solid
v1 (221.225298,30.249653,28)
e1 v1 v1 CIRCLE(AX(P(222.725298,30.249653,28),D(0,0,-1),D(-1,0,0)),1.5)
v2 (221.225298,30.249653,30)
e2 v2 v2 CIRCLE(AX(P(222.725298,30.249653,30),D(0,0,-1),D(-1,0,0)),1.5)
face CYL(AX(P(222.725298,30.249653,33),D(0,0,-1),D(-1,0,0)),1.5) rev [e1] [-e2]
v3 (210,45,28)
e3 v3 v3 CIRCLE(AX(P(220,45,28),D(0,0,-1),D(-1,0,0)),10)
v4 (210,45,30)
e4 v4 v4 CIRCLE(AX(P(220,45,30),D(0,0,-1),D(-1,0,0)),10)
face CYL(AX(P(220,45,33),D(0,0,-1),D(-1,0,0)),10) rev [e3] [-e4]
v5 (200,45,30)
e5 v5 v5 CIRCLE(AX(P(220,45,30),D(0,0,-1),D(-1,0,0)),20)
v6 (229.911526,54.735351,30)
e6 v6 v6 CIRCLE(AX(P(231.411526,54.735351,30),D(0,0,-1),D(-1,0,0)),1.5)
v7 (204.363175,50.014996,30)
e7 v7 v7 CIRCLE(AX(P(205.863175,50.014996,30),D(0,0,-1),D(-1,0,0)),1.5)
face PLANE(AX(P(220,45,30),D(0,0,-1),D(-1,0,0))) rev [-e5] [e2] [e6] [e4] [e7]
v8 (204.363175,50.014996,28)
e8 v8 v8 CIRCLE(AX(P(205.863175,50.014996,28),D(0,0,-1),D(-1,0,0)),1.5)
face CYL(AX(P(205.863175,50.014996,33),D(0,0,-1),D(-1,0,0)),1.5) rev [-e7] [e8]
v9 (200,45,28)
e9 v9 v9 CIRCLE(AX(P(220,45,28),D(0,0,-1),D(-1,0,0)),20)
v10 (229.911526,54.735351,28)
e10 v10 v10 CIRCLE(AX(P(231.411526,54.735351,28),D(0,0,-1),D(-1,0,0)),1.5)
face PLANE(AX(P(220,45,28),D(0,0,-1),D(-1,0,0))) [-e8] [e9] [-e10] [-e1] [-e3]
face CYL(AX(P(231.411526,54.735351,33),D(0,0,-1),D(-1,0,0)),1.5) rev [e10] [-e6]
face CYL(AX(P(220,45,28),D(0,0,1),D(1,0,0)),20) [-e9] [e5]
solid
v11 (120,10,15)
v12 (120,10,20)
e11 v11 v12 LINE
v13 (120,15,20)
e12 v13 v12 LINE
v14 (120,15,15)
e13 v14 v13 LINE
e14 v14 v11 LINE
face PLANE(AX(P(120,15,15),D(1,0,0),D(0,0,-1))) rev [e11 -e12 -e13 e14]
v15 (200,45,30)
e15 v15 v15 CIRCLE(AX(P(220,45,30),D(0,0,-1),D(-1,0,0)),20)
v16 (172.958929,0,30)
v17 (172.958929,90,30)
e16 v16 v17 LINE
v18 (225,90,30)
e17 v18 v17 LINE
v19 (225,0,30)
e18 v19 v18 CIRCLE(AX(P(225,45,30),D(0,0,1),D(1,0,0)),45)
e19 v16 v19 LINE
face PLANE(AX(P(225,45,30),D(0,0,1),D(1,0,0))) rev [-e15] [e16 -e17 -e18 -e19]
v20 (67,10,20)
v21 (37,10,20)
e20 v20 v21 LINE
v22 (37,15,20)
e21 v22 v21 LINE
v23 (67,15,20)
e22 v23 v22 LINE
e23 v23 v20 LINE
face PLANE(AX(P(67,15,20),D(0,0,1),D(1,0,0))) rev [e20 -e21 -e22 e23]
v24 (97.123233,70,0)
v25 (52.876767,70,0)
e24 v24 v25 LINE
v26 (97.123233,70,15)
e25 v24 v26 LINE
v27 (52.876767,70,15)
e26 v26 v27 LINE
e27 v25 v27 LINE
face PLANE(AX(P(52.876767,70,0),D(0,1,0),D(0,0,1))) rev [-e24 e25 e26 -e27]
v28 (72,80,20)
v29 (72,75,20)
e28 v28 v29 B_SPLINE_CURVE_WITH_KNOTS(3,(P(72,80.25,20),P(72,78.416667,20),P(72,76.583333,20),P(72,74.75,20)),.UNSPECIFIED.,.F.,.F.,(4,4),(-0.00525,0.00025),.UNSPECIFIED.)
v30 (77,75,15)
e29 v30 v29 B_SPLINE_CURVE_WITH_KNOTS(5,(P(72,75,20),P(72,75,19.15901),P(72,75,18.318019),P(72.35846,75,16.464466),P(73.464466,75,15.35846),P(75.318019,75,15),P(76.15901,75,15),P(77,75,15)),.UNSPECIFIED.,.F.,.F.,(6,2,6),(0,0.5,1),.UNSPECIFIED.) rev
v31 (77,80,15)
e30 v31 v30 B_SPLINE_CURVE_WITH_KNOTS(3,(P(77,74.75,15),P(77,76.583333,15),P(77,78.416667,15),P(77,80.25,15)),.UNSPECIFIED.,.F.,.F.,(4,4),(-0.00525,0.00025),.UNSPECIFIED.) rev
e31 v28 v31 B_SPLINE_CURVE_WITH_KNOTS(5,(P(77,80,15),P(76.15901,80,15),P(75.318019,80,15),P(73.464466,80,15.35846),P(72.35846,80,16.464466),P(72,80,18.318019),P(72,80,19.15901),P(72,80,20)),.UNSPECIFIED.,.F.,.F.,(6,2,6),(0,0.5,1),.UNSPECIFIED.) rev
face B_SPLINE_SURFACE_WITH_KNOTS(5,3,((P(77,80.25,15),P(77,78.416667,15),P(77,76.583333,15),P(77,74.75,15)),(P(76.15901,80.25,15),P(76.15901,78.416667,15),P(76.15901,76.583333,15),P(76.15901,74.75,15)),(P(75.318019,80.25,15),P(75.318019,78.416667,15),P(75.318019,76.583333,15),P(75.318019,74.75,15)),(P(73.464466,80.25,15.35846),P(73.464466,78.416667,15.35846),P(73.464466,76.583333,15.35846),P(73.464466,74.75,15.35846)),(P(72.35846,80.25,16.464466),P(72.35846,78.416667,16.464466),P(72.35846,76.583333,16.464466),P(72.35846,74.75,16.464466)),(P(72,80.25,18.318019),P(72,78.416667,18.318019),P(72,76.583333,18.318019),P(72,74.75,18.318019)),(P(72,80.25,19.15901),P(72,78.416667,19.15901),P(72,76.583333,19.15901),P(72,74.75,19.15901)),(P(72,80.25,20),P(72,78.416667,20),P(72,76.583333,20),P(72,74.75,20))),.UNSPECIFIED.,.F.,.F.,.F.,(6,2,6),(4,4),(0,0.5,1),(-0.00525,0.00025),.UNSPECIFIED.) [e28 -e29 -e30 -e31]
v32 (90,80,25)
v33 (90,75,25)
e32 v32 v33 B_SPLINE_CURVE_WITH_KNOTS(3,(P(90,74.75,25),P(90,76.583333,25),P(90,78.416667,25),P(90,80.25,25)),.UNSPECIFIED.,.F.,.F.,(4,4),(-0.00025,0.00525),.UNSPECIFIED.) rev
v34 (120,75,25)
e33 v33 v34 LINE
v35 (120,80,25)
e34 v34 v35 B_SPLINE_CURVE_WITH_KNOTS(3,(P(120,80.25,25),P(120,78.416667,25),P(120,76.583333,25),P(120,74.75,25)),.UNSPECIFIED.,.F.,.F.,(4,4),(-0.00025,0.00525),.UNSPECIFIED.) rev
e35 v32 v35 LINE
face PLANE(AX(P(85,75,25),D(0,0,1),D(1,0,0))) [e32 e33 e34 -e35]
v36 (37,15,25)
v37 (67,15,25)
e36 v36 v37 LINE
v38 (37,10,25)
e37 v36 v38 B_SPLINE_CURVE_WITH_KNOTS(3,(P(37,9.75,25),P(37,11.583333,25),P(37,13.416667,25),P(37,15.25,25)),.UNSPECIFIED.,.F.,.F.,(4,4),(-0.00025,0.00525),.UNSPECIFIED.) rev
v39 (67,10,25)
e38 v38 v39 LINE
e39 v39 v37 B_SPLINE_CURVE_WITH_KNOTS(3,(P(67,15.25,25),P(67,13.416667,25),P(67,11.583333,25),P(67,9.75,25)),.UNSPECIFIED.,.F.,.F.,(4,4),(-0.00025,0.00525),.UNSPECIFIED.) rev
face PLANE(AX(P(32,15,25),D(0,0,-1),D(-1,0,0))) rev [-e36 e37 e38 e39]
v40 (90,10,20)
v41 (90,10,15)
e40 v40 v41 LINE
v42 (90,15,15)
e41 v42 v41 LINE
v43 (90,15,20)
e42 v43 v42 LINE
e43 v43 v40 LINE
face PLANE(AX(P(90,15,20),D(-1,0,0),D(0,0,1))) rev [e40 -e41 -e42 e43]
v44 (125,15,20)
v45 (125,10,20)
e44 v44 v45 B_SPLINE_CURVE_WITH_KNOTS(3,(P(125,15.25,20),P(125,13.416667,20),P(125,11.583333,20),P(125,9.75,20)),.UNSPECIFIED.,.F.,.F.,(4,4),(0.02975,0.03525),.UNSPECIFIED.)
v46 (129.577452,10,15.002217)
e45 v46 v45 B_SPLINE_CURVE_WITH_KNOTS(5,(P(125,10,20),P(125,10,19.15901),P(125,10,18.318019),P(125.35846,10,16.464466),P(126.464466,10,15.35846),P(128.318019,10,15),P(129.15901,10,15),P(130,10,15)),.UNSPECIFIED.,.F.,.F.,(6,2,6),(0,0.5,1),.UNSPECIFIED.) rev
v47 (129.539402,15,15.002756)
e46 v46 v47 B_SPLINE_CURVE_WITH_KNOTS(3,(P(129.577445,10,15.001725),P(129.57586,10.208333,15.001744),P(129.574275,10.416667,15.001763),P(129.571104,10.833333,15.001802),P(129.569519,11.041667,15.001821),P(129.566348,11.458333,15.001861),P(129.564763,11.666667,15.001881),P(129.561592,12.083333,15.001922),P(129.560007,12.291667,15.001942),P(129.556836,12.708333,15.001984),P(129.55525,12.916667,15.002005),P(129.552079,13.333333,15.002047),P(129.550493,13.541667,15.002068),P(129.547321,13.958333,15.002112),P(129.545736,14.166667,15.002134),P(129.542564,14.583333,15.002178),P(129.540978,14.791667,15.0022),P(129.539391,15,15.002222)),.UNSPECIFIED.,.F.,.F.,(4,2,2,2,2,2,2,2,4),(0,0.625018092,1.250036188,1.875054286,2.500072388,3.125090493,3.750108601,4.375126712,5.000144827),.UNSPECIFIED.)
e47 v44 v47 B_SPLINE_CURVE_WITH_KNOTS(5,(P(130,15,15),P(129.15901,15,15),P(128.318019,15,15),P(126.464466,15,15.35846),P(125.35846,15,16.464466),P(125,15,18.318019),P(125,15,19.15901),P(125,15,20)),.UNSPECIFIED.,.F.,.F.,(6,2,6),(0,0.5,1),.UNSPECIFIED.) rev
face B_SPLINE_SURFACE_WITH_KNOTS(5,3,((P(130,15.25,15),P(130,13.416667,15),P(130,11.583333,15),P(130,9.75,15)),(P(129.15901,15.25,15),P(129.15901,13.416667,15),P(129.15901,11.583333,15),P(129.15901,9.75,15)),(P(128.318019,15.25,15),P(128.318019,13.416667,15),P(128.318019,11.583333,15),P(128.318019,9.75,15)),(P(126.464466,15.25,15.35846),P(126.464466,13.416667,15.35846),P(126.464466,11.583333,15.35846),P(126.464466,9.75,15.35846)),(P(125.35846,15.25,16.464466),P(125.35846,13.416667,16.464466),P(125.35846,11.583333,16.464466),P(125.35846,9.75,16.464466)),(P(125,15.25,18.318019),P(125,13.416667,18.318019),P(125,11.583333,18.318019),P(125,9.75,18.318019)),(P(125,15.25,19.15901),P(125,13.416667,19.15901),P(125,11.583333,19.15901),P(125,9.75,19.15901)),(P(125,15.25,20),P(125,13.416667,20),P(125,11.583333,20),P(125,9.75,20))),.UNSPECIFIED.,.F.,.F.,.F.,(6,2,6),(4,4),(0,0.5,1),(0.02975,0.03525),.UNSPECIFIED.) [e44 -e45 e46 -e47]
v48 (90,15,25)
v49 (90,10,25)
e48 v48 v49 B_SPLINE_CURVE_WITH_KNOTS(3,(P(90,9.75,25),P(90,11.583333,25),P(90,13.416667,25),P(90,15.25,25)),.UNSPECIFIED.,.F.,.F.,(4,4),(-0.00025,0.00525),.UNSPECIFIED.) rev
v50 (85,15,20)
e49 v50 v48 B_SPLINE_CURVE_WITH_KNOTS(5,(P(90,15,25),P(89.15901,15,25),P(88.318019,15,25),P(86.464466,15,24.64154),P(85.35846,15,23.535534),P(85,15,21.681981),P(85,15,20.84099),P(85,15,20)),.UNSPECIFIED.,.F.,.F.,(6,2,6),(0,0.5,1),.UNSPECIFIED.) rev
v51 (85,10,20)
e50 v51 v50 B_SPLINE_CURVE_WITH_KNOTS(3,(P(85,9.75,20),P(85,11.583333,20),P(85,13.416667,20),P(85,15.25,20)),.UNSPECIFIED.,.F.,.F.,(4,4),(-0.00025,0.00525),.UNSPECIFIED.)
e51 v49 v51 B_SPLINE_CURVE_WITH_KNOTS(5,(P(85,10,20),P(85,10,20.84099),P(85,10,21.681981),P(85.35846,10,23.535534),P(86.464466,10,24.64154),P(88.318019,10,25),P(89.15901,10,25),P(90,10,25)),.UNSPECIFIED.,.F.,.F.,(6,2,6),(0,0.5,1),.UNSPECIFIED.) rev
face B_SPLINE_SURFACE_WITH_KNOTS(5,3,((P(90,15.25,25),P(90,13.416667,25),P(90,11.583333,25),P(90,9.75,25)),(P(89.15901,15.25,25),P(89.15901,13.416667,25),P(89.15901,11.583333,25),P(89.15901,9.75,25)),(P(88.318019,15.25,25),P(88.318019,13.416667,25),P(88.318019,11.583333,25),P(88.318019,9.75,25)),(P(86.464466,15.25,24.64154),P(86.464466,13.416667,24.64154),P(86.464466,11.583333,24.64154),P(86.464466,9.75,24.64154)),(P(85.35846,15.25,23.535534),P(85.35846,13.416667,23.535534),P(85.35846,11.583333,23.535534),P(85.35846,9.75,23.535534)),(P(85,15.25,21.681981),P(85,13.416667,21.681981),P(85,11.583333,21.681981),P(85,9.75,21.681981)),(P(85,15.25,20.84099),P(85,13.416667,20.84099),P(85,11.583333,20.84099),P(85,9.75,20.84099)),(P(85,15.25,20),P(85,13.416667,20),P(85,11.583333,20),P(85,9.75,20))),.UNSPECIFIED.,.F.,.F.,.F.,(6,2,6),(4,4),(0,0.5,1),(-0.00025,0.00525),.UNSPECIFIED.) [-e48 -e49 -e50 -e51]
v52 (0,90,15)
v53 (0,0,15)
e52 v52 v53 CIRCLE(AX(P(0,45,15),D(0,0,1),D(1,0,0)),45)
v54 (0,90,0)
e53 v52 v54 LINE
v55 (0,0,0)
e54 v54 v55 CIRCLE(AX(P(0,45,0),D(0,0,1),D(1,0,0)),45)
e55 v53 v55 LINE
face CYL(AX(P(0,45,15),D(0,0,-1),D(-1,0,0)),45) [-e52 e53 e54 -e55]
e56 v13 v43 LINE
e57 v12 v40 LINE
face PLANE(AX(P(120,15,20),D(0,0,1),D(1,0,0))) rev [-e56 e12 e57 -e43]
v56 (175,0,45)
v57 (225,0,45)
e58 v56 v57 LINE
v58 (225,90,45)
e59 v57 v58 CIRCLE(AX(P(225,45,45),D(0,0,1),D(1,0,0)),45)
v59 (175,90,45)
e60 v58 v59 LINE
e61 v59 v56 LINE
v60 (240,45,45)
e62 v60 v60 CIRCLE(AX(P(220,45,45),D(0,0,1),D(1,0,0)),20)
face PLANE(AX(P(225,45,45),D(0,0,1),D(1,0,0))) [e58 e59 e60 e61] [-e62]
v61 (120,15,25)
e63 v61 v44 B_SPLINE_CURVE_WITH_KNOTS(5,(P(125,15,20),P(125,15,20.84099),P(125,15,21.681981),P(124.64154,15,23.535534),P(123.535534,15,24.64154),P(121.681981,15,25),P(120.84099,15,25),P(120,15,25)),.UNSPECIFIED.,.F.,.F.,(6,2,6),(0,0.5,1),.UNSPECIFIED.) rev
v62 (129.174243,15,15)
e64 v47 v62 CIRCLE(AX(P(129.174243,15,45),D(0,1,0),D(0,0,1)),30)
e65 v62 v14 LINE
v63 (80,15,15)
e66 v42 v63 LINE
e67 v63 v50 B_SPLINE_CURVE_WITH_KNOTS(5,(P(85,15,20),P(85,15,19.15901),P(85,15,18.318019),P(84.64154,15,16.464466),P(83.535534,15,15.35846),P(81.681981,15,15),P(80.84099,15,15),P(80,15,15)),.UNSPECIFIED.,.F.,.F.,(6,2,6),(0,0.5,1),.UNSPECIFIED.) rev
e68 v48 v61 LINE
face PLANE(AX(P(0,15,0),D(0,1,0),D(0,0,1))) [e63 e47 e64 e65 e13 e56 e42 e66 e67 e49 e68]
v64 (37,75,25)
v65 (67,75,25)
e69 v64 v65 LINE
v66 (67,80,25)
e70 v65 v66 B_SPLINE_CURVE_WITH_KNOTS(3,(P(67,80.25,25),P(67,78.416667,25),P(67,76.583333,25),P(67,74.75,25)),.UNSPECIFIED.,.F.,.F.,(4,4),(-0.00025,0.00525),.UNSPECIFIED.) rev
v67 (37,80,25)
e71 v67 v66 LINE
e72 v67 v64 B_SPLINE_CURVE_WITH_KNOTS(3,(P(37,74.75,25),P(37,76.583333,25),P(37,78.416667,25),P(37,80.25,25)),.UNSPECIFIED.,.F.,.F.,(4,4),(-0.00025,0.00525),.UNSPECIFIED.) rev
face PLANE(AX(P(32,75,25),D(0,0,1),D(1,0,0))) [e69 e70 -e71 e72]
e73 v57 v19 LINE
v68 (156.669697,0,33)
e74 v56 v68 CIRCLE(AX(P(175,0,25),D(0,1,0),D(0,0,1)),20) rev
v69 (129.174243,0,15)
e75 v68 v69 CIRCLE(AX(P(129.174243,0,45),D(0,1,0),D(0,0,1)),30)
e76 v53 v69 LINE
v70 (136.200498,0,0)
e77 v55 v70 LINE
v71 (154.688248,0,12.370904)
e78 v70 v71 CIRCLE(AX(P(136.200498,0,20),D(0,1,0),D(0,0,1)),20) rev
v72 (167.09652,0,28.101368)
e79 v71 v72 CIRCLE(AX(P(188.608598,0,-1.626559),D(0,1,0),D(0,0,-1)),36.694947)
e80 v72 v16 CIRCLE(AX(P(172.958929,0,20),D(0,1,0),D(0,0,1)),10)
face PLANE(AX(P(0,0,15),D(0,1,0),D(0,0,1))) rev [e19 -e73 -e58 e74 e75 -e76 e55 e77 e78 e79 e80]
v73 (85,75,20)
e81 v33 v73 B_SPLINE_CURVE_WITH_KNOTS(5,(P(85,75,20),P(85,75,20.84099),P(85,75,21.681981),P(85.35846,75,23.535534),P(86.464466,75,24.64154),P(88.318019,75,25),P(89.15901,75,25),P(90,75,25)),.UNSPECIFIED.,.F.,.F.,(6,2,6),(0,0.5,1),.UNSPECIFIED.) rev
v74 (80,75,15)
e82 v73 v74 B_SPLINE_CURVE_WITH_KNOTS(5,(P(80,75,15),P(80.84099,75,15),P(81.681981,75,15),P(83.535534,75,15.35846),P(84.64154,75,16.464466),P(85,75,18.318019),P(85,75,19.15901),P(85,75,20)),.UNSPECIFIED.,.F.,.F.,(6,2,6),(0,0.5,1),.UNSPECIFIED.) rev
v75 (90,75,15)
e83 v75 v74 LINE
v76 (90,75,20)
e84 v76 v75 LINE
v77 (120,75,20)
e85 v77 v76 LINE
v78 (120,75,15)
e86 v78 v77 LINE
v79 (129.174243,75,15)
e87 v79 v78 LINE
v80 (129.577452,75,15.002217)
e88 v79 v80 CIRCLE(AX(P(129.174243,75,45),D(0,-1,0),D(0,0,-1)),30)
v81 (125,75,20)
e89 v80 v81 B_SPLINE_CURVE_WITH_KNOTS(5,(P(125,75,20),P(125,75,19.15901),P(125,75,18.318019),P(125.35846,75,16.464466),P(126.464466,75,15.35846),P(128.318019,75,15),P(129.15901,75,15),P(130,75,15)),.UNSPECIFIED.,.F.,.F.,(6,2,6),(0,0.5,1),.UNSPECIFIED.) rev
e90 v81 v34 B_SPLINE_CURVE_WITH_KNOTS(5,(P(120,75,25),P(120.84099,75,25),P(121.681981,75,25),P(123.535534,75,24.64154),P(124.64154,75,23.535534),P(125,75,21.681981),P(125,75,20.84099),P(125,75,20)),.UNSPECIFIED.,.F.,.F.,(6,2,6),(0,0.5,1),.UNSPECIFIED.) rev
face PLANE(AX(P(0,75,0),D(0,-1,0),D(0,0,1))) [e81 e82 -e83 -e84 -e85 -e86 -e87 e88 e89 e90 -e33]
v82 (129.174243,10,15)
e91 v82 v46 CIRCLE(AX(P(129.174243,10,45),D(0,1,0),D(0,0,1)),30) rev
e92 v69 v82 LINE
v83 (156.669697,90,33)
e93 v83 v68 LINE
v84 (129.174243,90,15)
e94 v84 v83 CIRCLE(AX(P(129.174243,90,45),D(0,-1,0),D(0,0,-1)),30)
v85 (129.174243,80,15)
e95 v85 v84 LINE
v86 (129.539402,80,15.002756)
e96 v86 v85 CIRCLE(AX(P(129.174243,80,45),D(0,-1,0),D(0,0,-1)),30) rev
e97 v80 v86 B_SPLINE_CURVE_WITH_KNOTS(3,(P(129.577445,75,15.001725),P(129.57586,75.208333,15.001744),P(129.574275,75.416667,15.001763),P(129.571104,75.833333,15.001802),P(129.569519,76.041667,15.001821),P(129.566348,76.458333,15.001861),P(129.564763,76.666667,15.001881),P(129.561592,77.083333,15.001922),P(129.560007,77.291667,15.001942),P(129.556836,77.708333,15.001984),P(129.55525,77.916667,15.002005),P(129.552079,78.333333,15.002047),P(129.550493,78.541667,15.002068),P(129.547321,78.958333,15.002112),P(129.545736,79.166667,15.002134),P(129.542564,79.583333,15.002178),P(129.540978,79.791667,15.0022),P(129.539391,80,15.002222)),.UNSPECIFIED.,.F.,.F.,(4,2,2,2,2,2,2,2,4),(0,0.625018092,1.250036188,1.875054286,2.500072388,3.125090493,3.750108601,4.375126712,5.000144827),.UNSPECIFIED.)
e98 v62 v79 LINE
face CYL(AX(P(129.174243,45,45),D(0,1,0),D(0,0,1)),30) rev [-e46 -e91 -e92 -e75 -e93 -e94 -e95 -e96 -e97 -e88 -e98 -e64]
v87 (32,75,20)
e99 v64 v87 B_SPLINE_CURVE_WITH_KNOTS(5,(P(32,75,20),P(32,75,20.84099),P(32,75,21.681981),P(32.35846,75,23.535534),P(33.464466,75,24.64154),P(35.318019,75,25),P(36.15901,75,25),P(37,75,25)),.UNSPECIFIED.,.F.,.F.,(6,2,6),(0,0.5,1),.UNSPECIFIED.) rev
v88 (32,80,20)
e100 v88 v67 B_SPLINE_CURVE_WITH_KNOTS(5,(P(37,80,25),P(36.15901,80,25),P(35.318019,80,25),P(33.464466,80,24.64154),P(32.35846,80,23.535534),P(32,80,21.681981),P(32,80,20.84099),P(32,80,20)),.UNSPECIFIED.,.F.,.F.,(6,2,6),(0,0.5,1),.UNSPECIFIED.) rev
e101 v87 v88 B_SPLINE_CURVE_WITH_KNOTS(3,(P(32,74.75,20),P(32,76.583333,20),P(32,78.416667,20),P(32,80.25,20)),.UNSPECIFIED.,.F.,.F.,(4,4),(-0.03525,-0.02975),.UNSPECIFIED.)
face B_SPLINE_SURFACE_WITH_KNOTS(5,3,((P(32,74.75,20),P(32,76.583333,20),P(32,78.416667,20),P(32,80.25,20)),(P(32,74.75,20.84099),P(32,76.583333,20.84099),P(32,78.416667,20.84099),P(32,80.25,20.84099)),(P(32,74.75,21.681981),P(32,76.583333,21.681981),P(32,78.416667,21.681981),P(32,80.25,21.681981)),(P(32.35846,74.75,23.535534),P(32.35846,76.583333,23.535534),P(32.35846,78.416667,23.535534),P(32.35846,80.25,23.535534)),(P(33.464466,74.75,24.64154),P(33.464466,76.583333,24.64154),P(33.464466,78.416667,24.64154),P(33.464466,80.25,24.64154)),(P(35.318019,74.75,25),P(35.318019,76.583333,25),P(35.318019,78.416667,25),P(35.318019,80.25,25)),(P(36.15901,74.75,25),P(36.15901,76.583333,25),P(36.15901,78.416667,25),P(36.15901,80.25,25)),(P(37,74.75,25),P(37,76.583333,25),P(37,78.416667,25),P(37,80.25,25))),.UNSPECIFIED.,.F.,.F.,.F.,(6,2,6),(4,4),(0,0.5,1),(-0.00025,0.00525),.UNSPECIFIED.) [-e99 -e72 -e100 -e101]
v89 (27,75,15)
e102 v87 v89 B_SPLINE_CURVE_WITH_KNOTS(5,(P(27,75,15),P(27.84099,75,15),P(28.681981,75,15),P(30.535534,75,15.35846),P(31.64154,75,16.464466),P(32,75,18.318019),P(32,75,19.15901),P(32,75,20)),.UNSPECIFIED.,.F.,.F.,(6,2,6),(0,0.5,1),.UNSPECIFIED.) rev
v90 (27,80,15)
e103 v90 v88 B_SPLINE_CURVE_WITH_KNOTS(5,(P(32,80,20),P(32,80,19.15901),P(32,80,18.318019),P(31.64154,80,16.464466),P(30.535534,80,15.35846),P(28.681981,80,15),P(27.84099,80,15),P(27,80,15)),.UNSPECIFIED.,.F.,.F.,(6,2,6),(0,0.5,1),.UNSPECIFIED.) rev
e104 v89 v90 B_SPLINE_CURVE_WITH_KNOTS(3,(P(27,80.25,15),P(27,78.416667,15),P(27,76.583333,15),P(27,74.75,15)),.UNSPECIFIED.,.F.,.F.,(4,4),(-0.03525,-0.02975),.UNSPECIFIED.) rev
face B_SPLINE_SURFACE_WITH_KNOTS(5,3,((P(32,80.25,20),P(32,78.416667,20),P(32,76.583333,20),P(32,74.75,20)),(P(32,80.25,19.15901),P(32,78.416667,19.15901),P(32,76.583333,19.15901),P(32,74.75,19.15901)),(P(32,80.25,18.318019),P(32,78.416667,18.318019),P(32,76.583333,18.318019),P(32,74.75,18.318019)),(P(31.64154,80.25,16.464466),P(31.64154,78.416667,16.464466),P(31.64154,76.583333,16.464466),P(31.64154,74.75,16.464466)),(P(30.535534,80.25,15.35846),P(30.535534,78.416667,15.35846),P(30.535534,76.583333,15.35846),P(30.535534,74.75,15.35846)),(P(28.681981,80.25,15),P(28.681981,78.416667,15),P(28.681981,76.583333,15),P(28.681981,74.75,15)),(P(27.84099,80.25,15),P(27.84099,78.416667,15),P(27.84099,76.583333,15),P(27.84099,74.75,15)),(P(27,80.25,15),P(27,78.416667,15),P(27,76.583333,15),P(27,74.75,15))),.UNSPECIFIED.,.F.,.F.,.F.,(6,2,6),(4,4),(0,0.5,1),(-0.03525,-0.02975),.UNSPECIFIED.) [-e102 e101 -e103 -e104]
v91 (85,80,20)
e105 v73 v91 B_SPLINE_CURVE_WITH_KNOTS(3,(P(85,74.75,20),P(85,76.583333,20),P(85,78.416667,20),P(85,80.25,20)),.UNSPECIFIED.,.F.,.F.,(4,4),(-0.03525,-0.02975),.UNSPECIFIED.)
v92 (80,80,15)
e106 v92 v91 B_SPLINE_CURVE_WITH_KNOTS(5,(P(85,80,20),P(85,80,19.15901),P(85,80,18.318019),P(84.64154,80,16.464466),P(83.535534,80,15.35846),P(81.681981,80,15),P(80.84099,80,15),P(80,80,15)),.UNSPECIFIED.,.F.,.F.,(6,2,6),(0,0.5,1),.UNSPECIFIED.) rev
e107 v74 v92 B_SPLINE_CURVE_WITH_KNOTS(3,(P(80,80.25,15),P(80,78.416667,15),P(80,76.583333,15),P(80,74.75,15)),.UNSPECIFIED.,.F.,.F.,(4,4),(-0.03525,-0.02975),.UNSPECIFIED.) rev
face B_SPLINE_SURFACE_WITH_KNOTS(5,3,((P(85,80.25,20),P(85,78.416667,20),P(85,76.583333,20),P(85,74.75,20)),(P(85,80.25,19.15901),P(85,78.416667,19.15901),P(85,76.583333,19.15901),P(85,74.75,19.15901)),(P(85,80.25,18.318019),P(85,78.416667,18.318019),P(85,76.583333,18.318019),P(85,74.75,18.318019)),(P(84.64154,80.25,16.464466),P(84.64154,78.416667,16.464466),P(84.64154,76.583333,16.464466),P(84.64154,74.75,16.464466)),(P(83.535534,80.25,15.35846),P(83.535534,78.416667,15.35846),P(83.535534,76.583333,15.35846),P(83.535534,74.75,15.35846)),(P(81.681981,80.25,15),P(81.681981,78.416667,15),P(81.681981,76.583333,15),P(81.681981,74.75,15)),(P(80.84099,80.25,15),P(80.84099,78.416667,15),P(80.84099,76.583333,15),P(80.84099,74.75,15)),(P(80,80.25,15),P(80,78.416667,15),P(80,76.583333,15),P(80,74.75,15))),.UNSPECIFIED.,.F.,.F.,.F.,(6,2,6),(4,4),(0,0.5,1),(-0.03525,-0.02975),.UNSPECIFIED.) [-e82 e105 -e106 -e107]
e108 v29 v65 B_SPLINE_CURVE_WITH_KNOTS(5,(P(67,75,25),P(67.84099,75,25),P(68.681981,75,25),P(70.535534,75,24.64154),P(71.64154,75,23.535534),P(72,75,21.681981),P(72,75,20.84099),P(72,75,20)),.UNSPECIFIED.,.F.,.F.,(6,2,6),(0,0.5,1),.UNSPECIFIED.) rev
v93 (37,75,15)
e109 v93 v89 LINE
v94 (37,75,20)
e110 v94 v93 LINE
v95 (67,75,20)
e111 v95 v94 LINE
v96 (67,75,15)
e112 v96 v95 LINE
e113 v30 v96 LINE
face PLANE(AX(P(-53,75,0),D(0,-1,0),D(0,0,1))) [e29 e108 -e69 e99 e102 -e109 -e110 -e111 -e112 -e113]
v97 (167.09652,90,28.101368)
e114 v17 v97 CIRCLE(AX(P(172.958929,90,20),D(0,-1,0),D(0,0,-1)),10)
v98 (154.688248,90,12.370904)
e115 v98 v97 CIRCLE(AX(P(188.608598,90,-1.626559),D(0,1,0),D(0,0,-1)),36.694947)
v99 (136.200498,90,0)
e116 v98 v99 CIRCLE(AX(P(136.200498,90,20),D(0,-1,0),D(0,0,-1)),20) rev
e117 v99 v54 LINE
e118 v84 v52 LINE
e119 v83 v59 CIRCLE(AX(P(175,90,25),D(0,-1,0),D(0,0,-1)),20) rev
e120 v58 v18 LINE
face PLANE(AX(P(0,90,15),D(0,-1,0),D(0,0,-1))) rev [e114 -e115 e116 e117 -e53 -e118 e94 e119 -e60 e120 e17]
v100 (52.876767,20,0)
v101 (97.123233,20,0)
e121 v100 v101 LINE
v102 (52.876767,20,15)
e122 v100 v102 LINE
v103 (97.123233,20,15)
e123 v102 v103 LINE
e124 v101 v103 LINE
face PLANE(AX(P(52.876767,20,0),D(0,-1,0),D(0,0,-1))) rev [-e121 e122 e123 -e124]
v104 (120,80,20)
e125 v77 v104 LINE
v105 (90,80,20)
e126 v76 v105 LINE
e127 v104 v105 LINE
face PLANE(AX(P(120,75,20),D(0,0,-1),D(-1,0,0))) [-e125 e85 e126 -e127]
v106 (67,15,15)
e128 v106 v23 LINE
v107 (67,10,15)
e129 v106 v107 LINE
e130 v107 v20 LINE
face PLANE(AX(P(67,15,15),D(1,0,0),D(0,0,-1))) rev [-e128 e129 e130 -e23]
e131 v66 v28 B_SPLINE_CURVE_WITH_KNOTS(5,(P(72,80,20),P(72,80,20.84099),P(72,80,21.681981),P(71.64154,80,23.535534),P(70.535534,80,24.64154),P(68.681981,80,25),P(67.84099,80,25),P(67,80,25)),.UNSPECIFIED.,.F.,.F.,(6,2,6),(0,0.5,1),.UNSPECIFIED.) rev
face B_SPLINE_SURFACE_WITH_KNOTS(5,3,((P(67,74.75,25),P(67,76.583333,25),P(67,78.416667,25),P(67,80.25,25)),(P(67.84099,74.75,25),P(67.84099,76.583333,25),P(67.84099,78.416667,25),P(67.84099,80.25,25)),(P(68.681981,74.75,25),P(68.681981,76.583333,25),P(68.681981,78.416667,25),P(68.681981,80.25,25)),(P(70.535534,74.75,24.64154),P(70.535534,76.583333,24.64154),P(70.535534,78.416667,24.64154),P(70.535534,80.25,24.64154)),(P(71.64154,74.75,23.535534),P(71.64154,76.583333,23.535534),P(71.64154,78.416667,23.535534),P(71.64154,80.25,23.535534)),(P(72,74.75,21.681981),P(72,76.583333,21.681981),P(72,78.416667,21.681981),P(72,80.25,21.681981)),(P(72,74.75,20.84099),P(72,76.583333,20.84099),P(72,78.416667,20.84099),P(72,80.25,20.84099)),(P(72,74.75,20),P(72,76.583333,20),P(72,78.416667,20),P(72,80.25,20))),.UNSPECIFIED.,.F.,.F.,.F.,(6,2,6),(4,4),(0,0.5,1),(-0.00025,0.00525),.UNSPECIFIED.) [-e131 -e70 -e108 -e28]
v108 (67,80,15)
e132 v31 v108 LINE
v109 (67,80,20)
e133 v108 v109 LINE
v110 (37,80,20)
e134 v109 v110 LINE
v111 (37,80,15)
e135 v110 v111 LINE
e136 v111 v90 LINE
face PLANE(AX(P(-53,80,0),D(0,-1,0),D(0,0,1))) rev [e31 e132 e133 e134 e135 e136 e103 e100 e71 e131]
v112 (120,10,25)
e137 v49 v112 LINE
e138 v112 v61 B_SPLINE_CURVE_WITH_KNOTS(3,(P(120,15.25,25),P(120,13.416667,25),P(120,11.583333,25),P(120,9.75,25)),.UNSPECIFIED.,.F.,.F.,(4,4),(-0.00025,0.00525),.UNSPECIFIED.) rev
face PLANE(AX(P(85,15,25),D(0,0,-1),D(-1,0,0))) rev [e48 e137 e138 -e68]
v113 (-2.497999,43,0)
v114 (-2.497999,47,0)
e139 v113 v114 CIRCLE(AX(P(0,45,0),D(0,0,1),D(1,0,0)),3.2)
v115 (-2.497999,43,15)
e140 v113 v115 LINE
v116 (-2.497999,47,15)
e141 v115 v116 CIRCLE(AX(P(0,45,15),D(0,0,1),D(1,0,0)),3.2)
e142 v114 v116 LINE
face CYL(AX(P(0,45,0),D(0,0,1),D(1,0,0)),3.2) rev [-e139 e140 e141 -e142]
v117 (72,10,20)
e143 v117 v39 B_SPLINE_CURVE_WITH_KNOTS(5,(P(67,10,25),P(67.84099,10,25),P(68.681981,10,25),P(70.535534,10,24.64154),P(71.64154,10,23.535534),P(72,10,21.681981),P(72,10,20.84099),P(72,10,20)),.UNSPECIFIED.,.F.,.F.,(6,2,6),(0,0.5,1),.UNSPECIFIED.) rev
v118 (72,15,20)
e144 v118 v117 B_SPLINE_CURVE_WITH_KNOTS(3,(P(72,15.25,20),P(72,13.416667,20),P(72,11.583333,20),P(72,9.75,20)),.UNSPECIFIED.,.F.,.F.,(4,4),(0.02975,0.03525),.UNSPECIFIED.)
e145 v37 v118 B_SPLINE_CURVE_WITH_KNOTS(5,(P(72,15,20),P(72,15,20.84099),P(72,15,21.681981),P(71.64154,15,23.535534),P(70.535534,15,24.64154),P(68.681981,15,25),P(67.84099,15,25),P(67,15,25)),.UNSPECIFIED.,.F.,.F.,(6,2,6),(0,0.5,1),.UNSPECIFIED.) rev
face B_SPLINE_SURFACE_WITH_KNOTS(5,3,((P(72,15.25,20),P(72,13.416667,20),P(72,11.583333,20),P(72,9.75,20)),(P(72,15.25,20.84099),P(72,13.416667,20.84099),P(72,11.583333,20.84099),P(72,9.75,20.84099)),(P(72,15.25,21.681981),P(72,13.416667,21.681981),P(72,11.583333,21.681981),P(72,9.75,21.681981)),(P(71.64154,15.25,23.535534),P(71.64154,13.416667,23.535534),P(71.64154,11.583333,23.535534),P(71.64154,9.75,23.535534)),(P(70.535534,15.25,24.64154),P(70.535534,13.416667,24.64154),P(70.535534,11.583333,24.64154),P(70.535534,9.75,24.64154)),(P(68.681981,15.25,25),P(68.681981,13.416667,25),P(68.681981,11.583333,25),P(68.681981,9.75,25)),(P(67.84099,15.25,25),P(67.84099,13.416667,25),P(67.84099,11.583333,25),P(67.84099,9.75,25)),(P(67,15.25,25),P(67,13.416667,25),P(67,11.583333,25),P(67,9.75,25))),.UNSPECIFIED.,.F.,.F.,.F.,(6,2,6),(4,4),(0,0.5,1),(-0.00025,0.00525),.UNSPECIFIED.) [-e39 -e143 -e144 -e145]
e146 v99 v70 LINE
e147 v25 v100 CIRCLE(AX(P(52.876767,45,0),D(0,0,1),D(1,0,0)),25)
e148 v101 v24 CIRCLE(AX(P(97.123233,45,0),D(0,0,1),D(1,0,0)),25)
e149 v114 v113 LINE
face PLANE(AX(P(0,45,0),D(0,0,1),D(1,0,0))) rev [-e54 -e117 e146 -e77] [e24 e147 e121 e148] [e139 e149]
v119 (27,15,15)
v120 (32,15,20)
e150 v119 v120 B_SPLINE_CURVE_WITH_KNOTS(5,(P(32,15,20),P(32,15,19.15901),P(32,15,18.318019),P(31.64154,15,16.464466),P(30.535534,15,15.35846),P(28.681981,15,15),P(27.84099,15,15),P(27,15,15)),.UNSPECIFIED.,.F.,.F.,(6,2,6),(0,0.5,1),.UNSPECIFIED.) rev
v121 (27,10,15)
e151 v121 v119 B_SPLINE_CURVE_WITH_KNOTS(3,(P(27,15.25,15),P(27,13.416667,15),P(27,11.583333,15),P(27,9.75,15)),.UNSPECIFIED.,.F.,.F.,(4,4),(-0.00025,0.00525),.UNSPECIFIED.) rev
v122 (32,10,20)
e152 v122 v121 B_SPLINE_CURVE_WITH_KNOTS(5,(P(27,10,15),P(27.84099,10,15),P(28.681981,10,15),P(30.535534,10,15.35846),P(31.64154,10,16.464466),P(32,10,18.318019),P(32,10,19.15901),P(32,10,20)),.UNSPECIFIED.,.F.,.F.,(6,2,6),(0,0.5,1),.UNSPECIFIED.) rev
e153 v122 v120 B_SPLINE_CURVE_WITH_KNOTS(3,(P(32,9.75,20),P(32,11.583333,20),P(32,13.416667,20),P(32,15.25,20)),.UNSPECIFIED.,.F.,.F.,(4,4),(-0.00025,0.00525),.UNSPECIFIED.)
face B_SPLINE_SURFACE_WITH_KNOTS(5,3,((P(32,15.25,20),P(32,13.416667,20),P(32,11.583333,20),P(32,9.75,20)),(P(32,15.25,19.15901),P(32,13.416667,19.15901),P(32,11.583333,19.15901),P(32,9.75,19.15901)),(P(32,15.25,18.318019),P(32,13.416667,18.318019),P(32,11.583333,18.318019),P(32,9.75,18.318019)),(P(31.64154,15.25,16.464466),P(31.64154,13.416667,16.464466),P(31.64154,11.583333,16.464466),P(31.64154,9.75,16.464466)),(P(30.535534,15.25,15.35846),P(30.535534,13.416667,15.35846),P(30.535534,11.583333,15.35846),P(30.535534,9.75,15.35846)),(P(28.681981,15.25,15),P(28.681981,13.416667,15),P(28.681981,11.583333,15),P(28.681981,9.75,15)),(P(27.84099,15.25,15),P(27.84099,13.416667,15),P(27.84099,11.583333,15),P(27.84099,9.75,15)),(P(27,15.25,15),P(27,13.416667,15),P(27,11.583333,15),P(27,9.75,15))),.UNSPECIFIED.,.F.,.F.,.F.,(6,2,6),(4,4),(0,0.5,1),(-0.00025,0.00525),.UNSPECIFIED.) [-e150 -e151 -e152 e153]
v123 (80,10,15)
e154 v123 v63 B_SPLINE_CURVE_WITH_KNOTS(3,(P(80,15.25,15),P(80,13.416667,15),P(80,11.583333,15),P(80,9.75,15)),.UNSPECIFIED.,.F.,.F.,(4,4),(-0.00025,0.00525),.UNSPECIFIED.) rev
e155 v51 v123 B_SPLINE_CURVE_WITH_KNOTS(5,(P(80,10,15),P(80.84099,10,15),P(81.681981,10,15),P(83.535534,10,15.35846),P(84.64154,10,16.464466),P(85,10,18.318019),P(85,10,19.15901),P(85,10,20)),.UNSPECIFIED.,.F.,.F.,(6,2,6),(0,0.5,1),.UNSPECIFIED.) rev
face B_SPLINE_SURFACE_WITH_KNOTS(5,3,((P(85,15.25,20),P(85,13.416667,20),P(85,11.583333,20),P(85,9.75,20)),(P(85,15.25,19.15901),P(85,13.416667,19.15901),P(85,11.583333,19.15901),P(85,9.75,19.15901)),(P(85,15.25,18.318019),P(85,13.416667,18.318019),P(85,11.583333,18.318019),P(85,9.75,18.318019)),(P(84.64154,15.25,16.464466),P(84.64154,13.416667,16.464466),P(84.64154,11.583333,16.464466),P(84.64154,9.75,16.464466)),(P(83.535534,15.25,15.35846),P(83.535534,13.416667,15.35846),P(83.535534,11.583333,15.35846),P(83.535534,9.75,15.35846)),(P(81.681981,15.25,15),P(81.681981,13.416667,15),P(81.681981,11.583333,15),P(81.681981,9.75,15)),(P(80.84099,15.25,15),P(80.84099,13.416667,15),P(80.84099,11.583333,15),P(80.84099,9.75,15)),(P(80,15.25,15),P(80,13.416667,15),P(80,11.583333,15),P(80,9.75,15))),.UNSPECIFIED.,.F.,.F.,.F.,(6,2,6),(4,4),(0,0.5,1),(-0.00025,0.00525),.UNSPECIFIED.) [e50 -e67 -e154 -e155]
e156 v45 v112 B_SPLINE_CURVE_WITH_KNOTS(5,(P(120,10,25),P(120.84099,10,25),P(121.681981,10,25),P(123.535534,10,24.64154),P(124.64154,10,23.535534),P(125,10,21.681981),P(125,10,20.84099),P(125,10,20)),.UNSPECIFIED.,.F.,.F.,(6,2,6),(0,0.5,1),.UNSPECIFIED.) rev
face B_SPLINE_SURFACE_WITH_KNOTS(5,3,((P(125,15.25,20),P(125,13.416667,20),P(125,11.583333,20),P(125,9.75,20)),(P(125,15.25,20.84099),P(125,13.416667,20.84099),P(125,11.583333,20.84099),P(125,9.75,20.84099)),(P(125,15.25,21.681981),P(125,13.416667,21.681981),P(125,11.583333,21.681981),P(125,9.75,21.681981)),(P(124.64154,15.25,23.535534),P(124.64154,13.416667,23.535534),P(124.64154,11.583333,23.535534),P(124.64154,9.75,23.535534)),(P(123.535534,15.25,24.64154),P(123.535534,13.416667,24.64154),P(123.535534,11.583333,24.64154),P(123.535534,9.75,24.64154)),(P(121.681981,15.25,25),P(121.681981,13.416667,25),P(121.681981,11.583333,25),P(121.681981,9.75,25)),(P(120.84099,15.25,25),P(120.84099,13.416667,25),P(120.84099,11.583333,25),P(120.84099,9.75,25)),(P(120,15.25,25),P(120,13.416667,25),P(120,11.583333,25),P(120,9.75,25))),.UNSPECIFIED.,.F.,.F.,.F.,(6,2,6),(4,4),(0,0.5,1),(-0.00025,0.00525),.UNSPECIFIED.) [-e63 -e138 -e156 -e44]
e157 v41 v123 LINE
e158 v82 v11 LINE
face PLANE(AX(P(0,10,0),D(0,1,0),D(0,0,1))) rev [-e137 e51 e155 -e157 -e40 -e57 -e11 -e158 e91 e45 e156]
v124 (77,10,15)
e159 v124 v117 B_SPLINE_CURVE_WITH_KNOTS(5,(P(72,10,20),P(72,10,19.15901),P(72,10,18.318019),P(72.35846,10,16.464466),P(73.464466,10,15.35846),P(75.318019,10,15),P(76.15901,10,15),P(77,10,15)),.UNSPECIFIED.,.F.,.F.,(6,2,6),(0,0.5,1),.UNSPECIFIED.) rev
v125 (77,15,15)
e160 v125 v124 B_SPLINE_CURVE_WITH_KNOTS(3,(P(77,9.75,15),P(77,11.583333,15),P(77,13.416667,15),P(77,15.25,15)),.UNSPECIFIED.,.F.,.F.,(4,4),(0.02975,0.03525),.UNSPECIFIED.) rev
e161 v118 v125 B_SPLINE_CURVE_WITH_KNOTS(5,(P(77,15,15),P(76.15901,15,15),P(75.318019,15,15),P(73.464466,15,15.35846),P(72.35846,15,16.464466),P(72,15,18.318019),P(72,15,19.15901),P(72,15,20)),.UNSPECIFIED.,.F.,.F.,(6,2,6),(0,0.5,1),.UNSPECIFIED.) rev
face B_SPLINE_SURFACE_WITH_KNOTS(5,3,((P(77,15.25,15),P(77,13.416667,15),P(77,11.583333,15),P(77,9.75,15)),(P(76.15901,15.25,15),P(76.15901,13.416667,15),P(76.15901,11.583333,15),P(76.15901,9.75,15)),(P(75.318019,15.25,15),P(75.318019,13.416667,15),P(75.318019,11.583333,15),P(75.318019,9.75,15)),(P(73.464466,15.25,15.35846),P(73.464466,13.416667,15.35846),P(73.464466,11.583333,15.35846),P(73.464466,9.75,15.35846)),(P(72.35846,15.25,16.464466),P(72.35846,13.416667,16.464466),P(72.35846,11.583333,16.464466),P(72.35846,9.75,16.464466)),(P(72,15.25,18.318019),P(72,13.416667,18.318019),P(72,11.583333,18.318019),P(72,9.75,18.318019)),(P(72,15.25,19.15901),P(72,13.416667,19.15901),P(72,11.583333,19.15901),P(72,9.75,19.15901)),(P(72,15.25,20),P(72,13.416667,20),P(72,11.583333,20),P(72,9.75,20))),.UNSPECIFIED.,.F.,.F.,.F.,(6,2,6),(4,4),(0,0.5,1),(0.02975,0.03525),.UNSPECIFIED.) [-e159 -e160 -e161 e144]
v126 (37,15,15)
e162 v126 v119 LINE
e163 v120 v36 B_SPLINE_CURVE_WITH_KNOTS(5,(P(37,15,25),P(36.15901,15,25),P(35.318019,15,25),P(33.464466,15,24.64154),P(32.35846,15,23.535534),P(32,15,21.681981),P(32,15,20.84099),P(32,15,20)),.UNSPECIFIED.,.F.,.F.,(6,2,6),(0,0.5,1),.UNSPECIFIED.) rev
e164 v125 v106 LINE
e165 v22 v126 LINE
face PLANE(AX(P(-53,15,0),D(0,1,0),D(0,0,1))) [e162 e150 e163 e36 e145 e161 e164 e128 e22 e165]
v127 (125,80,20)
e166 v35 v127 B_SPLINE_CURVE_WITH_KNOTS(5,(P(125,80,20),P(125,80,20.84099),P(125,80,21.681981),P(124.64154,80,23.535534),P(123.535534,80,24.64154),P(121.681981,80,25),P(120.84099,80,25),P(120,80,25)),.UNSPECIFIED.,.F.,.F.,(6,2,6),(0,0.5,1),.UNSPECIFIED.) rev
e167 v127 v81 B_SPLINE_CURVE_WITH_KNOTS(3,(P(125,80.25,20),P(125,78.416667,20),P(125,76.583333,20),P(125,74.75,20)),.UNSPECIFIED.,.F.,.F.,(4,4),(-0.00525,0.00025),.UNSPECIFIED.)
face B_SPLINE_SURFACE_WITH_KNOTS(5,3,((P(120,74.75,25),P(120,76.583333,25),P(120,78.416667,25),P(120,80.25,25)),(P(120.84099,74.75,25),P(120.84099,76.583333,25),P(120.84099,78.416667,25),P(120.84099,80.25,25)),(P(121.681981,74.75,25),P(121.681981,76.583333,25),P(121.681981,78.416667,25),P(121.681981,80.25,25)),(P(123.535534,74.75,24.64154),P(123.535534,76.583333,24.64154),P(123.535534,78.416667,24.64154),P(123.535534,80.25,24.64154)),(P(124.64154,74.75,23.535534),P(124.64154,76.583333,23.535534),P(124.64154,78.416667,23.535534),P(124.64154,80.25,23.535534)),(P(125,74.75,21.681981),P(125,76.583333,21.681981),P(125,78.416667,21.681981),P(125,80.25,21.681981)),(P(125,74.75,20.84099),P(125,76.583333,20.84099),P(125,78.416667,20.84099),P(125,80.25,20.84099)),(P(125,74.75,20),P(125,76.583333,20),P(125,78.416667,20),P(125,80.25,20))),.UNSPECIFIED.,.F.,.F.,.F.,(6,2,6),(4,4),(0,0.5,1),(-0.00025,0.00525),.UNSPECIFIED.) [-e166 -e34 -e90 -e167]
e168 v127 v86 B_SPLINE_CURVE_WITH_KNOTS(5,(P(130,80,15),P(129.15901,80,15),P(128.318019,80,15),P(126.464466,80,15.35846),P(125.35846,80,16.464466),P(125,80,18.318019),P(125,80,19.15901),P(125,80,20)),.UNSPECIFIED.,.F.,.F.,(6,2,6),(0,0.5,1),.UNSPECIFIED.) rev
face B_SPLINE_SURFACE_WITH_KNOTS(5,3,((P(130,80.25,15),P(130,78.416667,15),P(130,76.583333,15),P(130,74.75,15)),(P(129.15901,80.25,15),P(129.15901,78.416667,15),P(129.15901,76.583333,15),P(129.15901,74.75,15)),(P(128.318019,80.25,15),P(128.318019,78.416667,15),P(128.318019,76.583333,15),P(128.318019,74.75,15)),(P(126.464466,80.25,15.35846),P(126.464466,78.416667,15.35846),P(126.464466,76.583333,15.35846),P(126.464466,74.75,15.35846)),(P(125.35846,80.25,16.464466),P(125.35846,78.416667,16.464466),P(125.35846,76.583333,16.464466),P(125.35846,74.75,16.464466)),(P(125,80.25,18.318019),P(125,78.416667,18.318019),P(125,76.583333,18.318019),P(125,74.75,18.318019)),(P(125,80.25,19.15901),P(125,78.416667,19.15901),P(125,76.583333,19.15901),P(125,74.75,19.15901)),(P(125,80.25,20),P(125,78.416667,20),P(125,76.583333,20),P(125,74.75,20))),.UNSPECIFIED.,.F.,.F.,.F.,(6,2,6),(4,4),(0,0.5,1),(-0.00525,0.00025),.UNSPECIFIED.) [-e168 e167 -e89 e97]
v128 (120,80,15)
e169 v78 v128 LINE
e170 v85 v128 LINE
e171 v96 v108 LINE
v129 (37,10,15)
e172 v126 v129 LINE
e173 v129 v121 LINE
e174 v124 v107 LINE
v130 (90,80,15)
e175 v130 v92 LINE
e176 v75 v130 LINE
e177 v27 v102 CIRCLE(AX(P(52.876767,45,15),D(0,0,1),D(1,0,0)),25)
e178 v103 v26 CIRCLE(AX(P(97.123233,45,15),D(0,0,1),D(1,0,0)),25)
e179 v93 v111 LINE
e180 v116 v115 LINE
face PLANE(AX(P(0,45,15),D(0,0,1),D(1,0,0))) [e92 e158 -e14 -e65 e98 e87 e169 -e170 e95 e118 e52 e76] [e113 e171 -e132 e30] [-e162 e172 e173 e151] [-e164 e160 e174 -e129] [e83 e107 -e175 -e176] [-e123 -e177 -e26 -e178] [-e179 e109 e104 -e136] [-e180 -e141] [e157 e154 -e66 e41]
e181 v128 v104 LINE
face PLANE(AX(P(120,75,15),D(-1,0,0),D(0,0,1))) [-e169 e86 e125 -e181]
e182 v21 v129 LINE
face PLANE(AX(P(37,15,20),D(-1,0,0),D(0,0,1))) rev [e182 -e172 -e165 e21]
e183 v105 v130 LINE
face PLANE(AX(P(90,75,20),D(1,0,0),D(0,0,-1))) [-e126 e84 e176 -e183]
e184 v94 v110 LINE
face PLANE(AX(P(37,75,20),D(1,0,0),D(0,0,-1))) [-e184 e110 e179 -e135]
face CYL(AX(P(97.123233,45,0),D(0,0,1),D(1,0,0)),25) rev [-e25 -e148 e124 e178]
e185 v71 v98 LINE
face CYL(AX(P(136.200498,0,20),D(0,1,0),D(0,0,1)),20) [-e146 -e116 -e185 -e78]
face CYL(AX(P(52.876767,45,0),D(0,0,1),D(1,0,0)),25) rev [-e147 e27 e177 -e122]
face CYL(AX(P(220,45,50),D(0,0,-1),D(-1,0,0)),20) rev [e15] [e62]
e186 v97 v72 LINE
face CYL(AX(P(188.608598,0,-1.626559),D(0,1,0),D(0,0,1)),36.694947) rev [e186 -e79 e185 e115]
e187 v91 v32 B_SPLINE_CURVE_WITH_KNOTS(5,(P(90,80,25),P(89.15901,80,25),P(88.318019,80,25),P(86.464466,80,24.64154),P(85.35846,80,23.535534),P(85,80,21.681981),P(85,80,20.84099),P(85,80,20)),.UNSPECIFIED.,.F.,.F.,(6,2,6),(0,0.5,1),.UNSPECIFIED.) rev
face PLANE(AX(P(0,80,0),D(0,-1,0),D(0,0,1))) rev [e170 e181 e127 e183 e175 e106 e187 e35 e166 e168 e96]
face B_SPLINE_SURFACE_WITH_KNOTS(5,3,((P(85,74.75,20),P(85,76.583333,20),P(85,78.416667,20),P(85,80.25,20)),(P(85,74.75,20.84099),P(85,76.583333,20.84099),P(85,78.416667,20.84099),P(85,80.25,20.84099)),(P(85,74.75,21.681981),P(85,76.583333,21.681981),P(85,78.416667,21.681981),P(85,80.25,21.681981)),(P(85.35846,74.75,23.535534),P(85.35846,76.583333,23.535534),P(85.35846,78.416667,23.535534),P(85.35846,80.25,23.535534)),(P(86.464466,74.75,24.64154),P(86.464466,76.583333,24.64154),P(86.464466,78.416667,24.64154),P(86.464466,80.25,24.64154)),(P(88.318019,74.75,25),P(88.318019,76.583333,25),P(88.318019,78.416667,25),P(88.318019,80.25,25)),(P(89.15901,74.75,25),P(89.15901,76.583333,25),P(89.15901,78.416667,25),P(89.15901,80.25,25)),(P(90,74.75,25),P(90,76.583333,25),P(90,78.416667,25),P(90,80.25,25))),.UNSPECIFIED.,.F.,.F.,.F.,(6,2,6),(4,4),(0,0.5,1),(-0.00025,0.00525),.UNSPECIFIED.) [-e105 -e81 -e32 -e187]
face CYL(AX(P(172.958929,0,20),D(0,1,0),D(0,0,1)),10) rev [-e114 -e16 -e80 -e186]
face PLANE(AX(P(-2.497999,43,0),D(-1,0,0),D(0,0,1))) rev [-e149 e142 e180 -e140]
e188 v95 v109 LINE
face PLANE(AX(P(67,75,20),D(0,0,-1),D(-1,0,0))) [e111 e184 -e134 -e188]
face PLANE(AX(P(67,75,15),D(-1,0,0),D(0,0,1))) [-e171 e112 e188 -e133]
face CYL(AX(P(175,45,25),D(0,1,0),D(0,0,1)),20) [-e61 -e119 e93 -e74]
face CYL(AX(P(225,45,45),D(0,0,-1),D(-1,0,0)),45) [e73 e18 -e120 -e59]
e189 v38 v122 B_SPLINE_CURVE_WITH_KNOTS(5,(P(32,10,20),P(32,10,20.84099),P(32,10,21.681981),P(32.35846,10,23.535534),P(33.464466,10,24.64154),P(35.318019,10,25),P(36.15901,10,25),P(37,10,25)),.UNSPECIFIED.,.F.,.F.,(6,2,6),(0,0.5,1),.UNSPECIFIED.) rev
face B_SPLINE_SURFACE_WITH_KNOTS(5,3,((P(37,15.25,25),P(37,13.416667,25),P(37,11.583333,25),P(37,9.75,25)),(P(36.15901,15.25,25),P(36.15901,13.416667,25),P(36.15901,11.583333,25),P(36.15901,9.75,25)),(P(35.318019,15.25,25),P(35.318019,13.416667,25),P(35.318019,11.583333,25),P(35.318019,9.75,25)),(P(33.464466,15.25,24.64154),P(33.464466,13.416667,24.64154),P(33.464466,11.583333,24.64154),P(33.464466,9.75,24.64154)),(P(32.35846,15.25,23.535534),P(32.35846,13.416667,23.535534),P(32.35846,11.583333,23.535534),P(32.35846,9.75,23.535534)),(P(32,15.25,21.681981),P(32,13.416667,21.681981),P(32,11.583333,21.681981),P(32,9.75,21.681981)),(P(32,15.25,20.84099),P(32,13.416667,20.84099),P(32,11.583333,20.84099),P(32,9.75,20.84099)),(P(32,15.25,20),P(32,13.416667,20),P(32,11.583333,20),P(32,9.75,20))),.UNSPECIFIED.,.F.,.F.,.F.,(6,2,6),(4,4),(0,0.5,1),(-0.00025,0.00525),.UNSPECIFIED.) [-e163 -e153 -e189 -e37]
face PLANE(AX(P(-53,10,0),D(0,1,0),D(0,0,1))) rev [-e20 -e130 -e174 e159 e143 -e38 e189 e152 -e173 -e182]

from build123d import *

# Parameters (mm, degrees)
BOSS_EXTRU_1_DEPTH                = 15
ESQUISSE2_W                       = 15
ESQUISSE2_H                       = 90
BOSS_EXTRU_2_DEPTH                = 15
BOSS_EXTRU_3_DEPTH                = 15
ENL_V_MAT_EXTRU_2_DEPTH           = 287.181760425
ESQUISSE11_R                      = 20
ENL_V_MAT_EXTRU_3_DEPTH           = 20
BOSS_EXTRU_5_DEPTH                = 5
R_P_TITION_LIN_AIRE2_COUNT        = 2
R_P_TITION_LIN_AIRE2_PITCH        = 53
R_P_TITION_LIN_AIRE2_COPY_1_DEPTH = 5
CONG_3_SIZE                       = 5
CONG_4_R                          = 20
CONG_8_R                          = 30
ENL_V_MAT_EXTRU_4_DEPTH           = 289.140590716
CONG_9_R                          = 20
CONG_10_R                         = 10
ESQUISSE23_R                      = 20
BOSS_EXTRU_7_DEPTH                = 2
ESQUISSE24_R                      = 10
ESQUISSE24_R_2                    = 1.5
ENL_V_MAT_EXTRU_5_DEPTH           = 5
ENL_V_MAT_EXTRU_6_DEPTH           = 287.181760467


with BuildPart() as part:
    # Esquisse1 → Boss.-Extru.1 (new body)
    with BuildSketch(Plane.XY):
        with BuildLine():
            Line((0, 90), (170, 90))
            Line((170, 90), (170, 0))
            Line((170, 0), (0, 0))
            ThreePointArc((0, 0), (-45, 45), (0, 90))
        make_face()
    extrude(amount=BOSS_EXTRU_1_DEPTH)

    # Esquisse2 → Boss.-Extru.2 (add)
    with BuildSketch(Plane.XY.offset(15)):
        with Locations((162.5, 45)):
            Rectangle(ESQUISSE2_W, ESQUISSE2_H)
    extrude(amount=BOSS_EXTRU_2_DEPTH)

    # Esquisse3 → Boss.-Extru.3 (add)
    with BuildSketch(Plane.XY.offset(30)):
        with BuildLine():
            Line((155, 90), (225, 90))
            ThreePointArc((225, 90), (270, 45), (225, 0))
            Line((225, 0), (155, 0))
            Line((155, 0), (155, 90))
        make_face()
    extrude(amount=BOSS_EXTRU_3_DEPTH)

    # Esquisse10 → Enlèv. mat.-Extru.2 (cut, through all)
    with BuildSketch(Plane.XY.offset(15)):
        with BuildLine():
            Line((-2.497999199, 43), (-2.497999199, 47))
            ThreePointArc((-2.497999199, 47), (3.2, 45), (-2.497999199, 43))
        make_face()
    extrude(amount=-ENL_V_MAT_EXTRU_2_DEPTH, mode=Mode.SUBTRACT)

    # Esquisse11 → Enlèv. mat.-Extru.3 (cut)
    with BuildSketch(Plane(origin=(0, 0, 30), x_dir=(-1, 0, 0), z_dir=(0, 0, -1))):
        with Locations((-220, 45)):
            Circle(ESQUISSE11_R)
    extrude(amount=-ENL_V_MAT_EXTRU_3_DEPTH, mode=Mode.SUBTRACT)

    # Esquisse20 → Boss.-Extru.5 (add)
    with BuildSketch(Plane(origin=(0, 10, 0), x_dir=(1, 0, 0), z_dir=(0, 1, 0))):
        Polygon((125, -25), (125, -15), (120, -15), (120, -20), (90, -20), (90, -15), (85, -15), (85, -25), align=None)
    boss_extru_5 = extrude(amount=BOSS_EXTRU_5_DEPTH)

    # Symétrie2: Boss.-Extru.5 across plane
    add(boss_extru_5.mirror(Plane(origin=(170, 45, 0), x_dir=(0, 0, 1), z_dir=(0, -1, 0))))

    # Répétition linéaire2: Boss.-Extru.5 ×2
    with Locations(*[(-i * R_P_TITION_LIN_AIRE2_PITCH, 0, 0) for i in range(1, R_P_TITION_LIN_AIRE2_COUNT)]):
        add(boss_extru_5)

    # Répétition linéaire2 copy 1 sketch → Répétition linéaire2 copy 1 (add)
    with BuildSketch(Plane(origin=(-53, 80, 0), x_dir=(1, 0, 0), z_dir=(0, -1, 0))):
        Polygon((125, 25), (125, 15), (120, 15), (120, 20), (90, 20), (90, 15), (85, 15), (85, 25), align=None)
    extrude(amount=R_P_TITION_LIN_AIRE2_COPY_1_DEPTH)

    # Congé3
    # a fillet whose section is not a circle: 5 mm, written as the material it adds along each edge
    with BuildSketch(Plane(origin=(125, 80, 15), x_dir=(1, 0, 0), z_dir=(0, -1, 0)), Plane(origin=(72, 80, 15), x_dir=(1, 0, 0), z_dir=(0, -1, 0)), Plane(origin=(32, 10, 15), x_dir=(-1, 0, 0), z_dir=(0, 1, 0)), Plane(origin=(85, 10, 15), x_dir=(-1, 0, 0), z_dir=(0, 1, 0))) as cong_3_piece_1:
        with BuildLine():
            add(Edge.make_bspline([(CONG_3_SIZE, 0), (CONG_3_SIZE * 0.831801948466, 0), (CONG_3_SIZE * 0.663603896932, 0), (CONG_3_SIZE * 0.292893218813, CONG_3_SIZE * 0.0716919198361), (CONG_3_SIZE * 0.0716919198361, CONG_3_SIZE * 0.292893218813), (0, CONG_3_SIZE * 0.663603896932), (0, CONG_3_SIZE * 0.831801948466), (0, CONG_3_SIZE)], knots=[0, 0, 0, 0, 0, 0, 0.5, 0.5, 1, 1, 1, 1, 1, 1], degree=5))
            Line((0, CONG_3_SIZE), (0, 0))
            Line((0, 0), (CONG_3_SIZE, 0))
        make_face()
    extrude(amount=5)
    with BuildSketch(Plane(origin=(85, 80, 15), x_dir=(-1, 0, 0), z_dir=(0, -1, 0)), Plane(origin=(32, 80, 15), x_dir=(-1, 0, 0), z_dir=(0, -1, 0)), Plane(origin=(72, 10, 15), x_dir=(1, 0, 0), z_dir=(0, 1, 0)), Plane(origin=(125, 10, 15), x_dir=(1, 0, 0), z_dir=(0, 1, 0))) as cong_3_piece_2:
        with BuildLine():
            add(Edge.make_bspline([(CONG_3_SIZE, 0), (CONG_3_SIZE * 0.831801948466, 0), (CONG_3_SIZE * 0.663603896932, 0), (CONG_3_SIZE * 0.292893218813, -CONG_3_SIZE * 0.0716919198361), (CONG_3_SIZE * 0.0716919198361, -CONG_3_SIZE * 0.292893218813), (0, -CONG_3_SIZE * 0.663603896932), (0, -CONG_3_SIZE * 0.831801948466), (0, -CONG_3_SIZE)], knots=[0, 0, 0, 0, 0, 0, 0.5, 0.5, 1, 1, 1, 1, 1, 1], degree=5))
            Line((0, -CONG_3_SIZE), (0, 0))
            Line((0, 0), (CONG_3_SIZE, 0))
        make_face()
    extrude(amount=5)
    # a fillet whose section is not a circle: 5 mm, written as the material it takes off along each edge
    with BuildSketch(Plane(origin=(125, 92.5, 25), x_dir=(-1, 0, 0), z_dir=(0, -1, 0)), Plane(origin=(85, 92.5, 25), x_dir=(0, 0, -1), z_dir=(0, -1, 0)), Plane(origin=(32, 92.5, 25), x_dir=(0, 0, -1), z_dir=(0, -1, 0)), Plane(origin=(72, 92.5, 25), x_dir=(-1, 0, 0), z_dir=(0, -1, 0))) as cong_3_2_piece_1:
        with BuildLine():
            add(Edge.make_bspline([(CONG_3_SIZE, 0), (CONG_3_SIZE * 0.831801948466, 0), (CONG_3_SIZE * 0.663603896932, 0), (CONG_3_SIZE * 0.292893218813, CONG_3_SIZE * 0.0716919198361), (CONG_3_SIZE * 0.0716919198361, CONG_3_SIZE * 0.292893218813), (0, CONG_3_SIZE * 0.663603896932), (0, CONG_3_SIZE * 0.831801948466), (0, CONG_3_SIZE)], knots=[0, 0, 0, 0, 0, 0, 0.5, 0.5, 1, 1, 1, 1, 1, 1], degree=5))
            Line((0, CONG_3_SIZE), (0, 0))
            Line((0, 0), (CONG_3_SIZE, 0))
        make_face()
    extrude(amount=30, mode=Mode.SUBTRACT)
    with BuildSketch(Plane(origin=(32, -2.5, 25), x_dir=(0, 0, -1), z_dir=(0, 1, 0)), Plane(origin=(72, -2.5, 25), x_dir=(-1, 0, 0), z_dir=(0, 1, 0)), Plane(origin=(85, -2.5, 25), x_dir=(0, 0, -1), z_dir=(0, 1, 0)), Plane(origin=(125, -2.5, 25), x_dir=(-1, 0, 0), z_dir=(0, 1, 0))) as cong_3_2_piece_2:
        with BuildLine():
            add(Edge.make_bspline([(CONG_3_SIZE, 0), (CONG_3_SIZE * 0.831801948466, 0), (CONG_3_SIZE * 0.663603896932, 0), (CONG_3_SIZE * 0.292893218813, -CONG_3_SIZE * 0.0716919198361), (CONG_3_SIZE * 0.0716919198361, -CONG_3_SIZE * 0.292893218813), (0, -CONG_3_SIZE * 0.663603896932), (0, -CONG_3_SIZE * 0.831801948466), (0, -CONG_3_SIZE)], knots=[0, 0, 0, 0, 0, 0, 0.5, 0.5, 1, 1, 1, 1, 1, 1], degree=5))
            Line((0, -CONG_3_SIZE), (0, 0))
            Line((0, 0), (CONG_3_SIZE, 0))
        make_face()
    extrude(amount=30, mode=Mode.SUBTRACT)

    # Congé4
    cong_4_edges = [part.edges().sort_by_distance(p)[0] for p in [
        (155, 45, 45),
    ]]
    fillet(cong_4_edges, radius=CONG_4_R)

    # Congé8
    # the kernel refuses this fillet: 30 mm, written as the material it adds along each edge
    with BuildSketch(Plane(origin=(155, 90, 15), x_dir=(0.09236442858628174, 0, 0.9957252695055648), z_dir=(0, -1, 0))) as cong_8_piece_1:
        with BuildLine():
            CenterArc((27.486376802, 28.486291656), CONG_8_R, 185.299645608, 66.421821522)
            Line((-2.385381283, 25.715358799), (-5.372557092, 25.438265513))
            Line((-5.372557092, 25.438265513), (-2.987175809, -0.277093286))
            Line((-2.987175809, -0.277093286), (0.277093286, -2.987175809))
            ThreePointArc((0.277093286, -2.987175809), (10.234345981, -2.063531523), (17.136365349, -2.848629166))
            Line((17.136365349, -2.848629166), (18.077275481, 0))
        make_face()
    extrude(amount=90)
    # the kernel refuses this fillet: 30 mm, written as the material it takes off along each edge
    with BuildSketch(Plane(origin=(170, 165, 0), x_dir=(-1, 0, 0), z_dir=(0, -1, 0))) as cong_8_2_piece_1:
        with BuildLine():
            CenterArc((CONG_8_R, -CONG_8_R), CONG_8_R, 90, 90)
            Line((0, -CONG_8_R), (0, 0))
            Line((0, 0), (CONG_8_R, 0))
        make_face()
    extrude(amount=240, mode=Mode.SUBTRACT)

    # Esquisse21 → Enlèv. mat.-Extru.4 (cut, through all)
    with BuildSketch(Plane(origin=(0, 90, 0), x_dir=(1, 0, 0), z_dir=(0, 1, 0))):
        with BuildLine():
            ThreePointArc((170, -30), (157.850911613, -18.385534141), (152.154704801, -2.57258395))
            ThreePointArc((152.154704801, -2.57258395), (165.145985207, -13.639088412), (170, -30))
        make_face()
    extrude(amount=-ENL_V_MAT_EXTRU_4_DEPTH, mode=Mode.SUBTRACT)

    # Congé9
    cong_9_edges = [part.edges().sort_by_distance(p)[0] for p in [
        (152.154704801, 45, 2.57258395),
    ]]
    fillet(cong_9_edges, radius=CONG_9_R)

    # Congé10
    cong_10_edges = [part.edges().sort_by_distance(p)[0] for p in [
        (170, 45, 30),
    ]]
    fillet(cong_10_edges, radius=CONG_10_R)

    # Esquisse25 → Enlèv. mat.-Extru.6 (cut, through all)
    with BuildSketch(Plane.XY.offset(15)):
        with BuildLine():
            Line((52.876767067, 70), (97.123232933, 70))
            ThreePointArc((97.123232933, 70), (122.123232933, 45), (97.123232933, 20))
            Line((97.123232933, 20), (52.876767067, 20))
            ThreePointArc((52.876767067, 20), (27.876767067, 45), (52.876767067, 70))
        make_face()
    extrude(amount=-ENL_V_MAT_EXTRU_6_DEPTH, mode=Mode.SUBTRACT)


with BuildPart() as body_2:
    # Esquisse23 → Boss.-Extru.7 (new body)
    with BuildSketch(Plane(origin=(0, 0, 30), x_dir=(-1, 0, 0), z_dir=(0, 0, -1))):
        with Locations((-220, 45)):
            Circle(ESQUISSE23_R)
    extrude(amount=BOSS_EXTRU_7_DEPTH)

    # Esquisse24 → Enlèv. mat.-Extru.5 (cut)
    with BuildSketch(Plane(origin=(0, 0, 28), x_dir=(-1, 0, 0), z_dir=(0, 0, -1))):
        with Locations((-220, 45)):
            Circle(ESQUISSE24_R)
        with Locations((-205.863175268, 50.014996162)):
            Circle(ESQUISSE24_R_2)
        with Locations((-222.725298289, 30.249652572)):
            Circle(ESQUISSE24_R_2)
        with Locations((-231.411526442, 54.735351265)):
            Circle(ESQUISSE24_R_2)
    extrude(amount=-ENL_V_MAT_EXTRU_5_DEPTH, mode=Mode.SUBTRACT)


solid = Compound([part.part, body_2.part])
